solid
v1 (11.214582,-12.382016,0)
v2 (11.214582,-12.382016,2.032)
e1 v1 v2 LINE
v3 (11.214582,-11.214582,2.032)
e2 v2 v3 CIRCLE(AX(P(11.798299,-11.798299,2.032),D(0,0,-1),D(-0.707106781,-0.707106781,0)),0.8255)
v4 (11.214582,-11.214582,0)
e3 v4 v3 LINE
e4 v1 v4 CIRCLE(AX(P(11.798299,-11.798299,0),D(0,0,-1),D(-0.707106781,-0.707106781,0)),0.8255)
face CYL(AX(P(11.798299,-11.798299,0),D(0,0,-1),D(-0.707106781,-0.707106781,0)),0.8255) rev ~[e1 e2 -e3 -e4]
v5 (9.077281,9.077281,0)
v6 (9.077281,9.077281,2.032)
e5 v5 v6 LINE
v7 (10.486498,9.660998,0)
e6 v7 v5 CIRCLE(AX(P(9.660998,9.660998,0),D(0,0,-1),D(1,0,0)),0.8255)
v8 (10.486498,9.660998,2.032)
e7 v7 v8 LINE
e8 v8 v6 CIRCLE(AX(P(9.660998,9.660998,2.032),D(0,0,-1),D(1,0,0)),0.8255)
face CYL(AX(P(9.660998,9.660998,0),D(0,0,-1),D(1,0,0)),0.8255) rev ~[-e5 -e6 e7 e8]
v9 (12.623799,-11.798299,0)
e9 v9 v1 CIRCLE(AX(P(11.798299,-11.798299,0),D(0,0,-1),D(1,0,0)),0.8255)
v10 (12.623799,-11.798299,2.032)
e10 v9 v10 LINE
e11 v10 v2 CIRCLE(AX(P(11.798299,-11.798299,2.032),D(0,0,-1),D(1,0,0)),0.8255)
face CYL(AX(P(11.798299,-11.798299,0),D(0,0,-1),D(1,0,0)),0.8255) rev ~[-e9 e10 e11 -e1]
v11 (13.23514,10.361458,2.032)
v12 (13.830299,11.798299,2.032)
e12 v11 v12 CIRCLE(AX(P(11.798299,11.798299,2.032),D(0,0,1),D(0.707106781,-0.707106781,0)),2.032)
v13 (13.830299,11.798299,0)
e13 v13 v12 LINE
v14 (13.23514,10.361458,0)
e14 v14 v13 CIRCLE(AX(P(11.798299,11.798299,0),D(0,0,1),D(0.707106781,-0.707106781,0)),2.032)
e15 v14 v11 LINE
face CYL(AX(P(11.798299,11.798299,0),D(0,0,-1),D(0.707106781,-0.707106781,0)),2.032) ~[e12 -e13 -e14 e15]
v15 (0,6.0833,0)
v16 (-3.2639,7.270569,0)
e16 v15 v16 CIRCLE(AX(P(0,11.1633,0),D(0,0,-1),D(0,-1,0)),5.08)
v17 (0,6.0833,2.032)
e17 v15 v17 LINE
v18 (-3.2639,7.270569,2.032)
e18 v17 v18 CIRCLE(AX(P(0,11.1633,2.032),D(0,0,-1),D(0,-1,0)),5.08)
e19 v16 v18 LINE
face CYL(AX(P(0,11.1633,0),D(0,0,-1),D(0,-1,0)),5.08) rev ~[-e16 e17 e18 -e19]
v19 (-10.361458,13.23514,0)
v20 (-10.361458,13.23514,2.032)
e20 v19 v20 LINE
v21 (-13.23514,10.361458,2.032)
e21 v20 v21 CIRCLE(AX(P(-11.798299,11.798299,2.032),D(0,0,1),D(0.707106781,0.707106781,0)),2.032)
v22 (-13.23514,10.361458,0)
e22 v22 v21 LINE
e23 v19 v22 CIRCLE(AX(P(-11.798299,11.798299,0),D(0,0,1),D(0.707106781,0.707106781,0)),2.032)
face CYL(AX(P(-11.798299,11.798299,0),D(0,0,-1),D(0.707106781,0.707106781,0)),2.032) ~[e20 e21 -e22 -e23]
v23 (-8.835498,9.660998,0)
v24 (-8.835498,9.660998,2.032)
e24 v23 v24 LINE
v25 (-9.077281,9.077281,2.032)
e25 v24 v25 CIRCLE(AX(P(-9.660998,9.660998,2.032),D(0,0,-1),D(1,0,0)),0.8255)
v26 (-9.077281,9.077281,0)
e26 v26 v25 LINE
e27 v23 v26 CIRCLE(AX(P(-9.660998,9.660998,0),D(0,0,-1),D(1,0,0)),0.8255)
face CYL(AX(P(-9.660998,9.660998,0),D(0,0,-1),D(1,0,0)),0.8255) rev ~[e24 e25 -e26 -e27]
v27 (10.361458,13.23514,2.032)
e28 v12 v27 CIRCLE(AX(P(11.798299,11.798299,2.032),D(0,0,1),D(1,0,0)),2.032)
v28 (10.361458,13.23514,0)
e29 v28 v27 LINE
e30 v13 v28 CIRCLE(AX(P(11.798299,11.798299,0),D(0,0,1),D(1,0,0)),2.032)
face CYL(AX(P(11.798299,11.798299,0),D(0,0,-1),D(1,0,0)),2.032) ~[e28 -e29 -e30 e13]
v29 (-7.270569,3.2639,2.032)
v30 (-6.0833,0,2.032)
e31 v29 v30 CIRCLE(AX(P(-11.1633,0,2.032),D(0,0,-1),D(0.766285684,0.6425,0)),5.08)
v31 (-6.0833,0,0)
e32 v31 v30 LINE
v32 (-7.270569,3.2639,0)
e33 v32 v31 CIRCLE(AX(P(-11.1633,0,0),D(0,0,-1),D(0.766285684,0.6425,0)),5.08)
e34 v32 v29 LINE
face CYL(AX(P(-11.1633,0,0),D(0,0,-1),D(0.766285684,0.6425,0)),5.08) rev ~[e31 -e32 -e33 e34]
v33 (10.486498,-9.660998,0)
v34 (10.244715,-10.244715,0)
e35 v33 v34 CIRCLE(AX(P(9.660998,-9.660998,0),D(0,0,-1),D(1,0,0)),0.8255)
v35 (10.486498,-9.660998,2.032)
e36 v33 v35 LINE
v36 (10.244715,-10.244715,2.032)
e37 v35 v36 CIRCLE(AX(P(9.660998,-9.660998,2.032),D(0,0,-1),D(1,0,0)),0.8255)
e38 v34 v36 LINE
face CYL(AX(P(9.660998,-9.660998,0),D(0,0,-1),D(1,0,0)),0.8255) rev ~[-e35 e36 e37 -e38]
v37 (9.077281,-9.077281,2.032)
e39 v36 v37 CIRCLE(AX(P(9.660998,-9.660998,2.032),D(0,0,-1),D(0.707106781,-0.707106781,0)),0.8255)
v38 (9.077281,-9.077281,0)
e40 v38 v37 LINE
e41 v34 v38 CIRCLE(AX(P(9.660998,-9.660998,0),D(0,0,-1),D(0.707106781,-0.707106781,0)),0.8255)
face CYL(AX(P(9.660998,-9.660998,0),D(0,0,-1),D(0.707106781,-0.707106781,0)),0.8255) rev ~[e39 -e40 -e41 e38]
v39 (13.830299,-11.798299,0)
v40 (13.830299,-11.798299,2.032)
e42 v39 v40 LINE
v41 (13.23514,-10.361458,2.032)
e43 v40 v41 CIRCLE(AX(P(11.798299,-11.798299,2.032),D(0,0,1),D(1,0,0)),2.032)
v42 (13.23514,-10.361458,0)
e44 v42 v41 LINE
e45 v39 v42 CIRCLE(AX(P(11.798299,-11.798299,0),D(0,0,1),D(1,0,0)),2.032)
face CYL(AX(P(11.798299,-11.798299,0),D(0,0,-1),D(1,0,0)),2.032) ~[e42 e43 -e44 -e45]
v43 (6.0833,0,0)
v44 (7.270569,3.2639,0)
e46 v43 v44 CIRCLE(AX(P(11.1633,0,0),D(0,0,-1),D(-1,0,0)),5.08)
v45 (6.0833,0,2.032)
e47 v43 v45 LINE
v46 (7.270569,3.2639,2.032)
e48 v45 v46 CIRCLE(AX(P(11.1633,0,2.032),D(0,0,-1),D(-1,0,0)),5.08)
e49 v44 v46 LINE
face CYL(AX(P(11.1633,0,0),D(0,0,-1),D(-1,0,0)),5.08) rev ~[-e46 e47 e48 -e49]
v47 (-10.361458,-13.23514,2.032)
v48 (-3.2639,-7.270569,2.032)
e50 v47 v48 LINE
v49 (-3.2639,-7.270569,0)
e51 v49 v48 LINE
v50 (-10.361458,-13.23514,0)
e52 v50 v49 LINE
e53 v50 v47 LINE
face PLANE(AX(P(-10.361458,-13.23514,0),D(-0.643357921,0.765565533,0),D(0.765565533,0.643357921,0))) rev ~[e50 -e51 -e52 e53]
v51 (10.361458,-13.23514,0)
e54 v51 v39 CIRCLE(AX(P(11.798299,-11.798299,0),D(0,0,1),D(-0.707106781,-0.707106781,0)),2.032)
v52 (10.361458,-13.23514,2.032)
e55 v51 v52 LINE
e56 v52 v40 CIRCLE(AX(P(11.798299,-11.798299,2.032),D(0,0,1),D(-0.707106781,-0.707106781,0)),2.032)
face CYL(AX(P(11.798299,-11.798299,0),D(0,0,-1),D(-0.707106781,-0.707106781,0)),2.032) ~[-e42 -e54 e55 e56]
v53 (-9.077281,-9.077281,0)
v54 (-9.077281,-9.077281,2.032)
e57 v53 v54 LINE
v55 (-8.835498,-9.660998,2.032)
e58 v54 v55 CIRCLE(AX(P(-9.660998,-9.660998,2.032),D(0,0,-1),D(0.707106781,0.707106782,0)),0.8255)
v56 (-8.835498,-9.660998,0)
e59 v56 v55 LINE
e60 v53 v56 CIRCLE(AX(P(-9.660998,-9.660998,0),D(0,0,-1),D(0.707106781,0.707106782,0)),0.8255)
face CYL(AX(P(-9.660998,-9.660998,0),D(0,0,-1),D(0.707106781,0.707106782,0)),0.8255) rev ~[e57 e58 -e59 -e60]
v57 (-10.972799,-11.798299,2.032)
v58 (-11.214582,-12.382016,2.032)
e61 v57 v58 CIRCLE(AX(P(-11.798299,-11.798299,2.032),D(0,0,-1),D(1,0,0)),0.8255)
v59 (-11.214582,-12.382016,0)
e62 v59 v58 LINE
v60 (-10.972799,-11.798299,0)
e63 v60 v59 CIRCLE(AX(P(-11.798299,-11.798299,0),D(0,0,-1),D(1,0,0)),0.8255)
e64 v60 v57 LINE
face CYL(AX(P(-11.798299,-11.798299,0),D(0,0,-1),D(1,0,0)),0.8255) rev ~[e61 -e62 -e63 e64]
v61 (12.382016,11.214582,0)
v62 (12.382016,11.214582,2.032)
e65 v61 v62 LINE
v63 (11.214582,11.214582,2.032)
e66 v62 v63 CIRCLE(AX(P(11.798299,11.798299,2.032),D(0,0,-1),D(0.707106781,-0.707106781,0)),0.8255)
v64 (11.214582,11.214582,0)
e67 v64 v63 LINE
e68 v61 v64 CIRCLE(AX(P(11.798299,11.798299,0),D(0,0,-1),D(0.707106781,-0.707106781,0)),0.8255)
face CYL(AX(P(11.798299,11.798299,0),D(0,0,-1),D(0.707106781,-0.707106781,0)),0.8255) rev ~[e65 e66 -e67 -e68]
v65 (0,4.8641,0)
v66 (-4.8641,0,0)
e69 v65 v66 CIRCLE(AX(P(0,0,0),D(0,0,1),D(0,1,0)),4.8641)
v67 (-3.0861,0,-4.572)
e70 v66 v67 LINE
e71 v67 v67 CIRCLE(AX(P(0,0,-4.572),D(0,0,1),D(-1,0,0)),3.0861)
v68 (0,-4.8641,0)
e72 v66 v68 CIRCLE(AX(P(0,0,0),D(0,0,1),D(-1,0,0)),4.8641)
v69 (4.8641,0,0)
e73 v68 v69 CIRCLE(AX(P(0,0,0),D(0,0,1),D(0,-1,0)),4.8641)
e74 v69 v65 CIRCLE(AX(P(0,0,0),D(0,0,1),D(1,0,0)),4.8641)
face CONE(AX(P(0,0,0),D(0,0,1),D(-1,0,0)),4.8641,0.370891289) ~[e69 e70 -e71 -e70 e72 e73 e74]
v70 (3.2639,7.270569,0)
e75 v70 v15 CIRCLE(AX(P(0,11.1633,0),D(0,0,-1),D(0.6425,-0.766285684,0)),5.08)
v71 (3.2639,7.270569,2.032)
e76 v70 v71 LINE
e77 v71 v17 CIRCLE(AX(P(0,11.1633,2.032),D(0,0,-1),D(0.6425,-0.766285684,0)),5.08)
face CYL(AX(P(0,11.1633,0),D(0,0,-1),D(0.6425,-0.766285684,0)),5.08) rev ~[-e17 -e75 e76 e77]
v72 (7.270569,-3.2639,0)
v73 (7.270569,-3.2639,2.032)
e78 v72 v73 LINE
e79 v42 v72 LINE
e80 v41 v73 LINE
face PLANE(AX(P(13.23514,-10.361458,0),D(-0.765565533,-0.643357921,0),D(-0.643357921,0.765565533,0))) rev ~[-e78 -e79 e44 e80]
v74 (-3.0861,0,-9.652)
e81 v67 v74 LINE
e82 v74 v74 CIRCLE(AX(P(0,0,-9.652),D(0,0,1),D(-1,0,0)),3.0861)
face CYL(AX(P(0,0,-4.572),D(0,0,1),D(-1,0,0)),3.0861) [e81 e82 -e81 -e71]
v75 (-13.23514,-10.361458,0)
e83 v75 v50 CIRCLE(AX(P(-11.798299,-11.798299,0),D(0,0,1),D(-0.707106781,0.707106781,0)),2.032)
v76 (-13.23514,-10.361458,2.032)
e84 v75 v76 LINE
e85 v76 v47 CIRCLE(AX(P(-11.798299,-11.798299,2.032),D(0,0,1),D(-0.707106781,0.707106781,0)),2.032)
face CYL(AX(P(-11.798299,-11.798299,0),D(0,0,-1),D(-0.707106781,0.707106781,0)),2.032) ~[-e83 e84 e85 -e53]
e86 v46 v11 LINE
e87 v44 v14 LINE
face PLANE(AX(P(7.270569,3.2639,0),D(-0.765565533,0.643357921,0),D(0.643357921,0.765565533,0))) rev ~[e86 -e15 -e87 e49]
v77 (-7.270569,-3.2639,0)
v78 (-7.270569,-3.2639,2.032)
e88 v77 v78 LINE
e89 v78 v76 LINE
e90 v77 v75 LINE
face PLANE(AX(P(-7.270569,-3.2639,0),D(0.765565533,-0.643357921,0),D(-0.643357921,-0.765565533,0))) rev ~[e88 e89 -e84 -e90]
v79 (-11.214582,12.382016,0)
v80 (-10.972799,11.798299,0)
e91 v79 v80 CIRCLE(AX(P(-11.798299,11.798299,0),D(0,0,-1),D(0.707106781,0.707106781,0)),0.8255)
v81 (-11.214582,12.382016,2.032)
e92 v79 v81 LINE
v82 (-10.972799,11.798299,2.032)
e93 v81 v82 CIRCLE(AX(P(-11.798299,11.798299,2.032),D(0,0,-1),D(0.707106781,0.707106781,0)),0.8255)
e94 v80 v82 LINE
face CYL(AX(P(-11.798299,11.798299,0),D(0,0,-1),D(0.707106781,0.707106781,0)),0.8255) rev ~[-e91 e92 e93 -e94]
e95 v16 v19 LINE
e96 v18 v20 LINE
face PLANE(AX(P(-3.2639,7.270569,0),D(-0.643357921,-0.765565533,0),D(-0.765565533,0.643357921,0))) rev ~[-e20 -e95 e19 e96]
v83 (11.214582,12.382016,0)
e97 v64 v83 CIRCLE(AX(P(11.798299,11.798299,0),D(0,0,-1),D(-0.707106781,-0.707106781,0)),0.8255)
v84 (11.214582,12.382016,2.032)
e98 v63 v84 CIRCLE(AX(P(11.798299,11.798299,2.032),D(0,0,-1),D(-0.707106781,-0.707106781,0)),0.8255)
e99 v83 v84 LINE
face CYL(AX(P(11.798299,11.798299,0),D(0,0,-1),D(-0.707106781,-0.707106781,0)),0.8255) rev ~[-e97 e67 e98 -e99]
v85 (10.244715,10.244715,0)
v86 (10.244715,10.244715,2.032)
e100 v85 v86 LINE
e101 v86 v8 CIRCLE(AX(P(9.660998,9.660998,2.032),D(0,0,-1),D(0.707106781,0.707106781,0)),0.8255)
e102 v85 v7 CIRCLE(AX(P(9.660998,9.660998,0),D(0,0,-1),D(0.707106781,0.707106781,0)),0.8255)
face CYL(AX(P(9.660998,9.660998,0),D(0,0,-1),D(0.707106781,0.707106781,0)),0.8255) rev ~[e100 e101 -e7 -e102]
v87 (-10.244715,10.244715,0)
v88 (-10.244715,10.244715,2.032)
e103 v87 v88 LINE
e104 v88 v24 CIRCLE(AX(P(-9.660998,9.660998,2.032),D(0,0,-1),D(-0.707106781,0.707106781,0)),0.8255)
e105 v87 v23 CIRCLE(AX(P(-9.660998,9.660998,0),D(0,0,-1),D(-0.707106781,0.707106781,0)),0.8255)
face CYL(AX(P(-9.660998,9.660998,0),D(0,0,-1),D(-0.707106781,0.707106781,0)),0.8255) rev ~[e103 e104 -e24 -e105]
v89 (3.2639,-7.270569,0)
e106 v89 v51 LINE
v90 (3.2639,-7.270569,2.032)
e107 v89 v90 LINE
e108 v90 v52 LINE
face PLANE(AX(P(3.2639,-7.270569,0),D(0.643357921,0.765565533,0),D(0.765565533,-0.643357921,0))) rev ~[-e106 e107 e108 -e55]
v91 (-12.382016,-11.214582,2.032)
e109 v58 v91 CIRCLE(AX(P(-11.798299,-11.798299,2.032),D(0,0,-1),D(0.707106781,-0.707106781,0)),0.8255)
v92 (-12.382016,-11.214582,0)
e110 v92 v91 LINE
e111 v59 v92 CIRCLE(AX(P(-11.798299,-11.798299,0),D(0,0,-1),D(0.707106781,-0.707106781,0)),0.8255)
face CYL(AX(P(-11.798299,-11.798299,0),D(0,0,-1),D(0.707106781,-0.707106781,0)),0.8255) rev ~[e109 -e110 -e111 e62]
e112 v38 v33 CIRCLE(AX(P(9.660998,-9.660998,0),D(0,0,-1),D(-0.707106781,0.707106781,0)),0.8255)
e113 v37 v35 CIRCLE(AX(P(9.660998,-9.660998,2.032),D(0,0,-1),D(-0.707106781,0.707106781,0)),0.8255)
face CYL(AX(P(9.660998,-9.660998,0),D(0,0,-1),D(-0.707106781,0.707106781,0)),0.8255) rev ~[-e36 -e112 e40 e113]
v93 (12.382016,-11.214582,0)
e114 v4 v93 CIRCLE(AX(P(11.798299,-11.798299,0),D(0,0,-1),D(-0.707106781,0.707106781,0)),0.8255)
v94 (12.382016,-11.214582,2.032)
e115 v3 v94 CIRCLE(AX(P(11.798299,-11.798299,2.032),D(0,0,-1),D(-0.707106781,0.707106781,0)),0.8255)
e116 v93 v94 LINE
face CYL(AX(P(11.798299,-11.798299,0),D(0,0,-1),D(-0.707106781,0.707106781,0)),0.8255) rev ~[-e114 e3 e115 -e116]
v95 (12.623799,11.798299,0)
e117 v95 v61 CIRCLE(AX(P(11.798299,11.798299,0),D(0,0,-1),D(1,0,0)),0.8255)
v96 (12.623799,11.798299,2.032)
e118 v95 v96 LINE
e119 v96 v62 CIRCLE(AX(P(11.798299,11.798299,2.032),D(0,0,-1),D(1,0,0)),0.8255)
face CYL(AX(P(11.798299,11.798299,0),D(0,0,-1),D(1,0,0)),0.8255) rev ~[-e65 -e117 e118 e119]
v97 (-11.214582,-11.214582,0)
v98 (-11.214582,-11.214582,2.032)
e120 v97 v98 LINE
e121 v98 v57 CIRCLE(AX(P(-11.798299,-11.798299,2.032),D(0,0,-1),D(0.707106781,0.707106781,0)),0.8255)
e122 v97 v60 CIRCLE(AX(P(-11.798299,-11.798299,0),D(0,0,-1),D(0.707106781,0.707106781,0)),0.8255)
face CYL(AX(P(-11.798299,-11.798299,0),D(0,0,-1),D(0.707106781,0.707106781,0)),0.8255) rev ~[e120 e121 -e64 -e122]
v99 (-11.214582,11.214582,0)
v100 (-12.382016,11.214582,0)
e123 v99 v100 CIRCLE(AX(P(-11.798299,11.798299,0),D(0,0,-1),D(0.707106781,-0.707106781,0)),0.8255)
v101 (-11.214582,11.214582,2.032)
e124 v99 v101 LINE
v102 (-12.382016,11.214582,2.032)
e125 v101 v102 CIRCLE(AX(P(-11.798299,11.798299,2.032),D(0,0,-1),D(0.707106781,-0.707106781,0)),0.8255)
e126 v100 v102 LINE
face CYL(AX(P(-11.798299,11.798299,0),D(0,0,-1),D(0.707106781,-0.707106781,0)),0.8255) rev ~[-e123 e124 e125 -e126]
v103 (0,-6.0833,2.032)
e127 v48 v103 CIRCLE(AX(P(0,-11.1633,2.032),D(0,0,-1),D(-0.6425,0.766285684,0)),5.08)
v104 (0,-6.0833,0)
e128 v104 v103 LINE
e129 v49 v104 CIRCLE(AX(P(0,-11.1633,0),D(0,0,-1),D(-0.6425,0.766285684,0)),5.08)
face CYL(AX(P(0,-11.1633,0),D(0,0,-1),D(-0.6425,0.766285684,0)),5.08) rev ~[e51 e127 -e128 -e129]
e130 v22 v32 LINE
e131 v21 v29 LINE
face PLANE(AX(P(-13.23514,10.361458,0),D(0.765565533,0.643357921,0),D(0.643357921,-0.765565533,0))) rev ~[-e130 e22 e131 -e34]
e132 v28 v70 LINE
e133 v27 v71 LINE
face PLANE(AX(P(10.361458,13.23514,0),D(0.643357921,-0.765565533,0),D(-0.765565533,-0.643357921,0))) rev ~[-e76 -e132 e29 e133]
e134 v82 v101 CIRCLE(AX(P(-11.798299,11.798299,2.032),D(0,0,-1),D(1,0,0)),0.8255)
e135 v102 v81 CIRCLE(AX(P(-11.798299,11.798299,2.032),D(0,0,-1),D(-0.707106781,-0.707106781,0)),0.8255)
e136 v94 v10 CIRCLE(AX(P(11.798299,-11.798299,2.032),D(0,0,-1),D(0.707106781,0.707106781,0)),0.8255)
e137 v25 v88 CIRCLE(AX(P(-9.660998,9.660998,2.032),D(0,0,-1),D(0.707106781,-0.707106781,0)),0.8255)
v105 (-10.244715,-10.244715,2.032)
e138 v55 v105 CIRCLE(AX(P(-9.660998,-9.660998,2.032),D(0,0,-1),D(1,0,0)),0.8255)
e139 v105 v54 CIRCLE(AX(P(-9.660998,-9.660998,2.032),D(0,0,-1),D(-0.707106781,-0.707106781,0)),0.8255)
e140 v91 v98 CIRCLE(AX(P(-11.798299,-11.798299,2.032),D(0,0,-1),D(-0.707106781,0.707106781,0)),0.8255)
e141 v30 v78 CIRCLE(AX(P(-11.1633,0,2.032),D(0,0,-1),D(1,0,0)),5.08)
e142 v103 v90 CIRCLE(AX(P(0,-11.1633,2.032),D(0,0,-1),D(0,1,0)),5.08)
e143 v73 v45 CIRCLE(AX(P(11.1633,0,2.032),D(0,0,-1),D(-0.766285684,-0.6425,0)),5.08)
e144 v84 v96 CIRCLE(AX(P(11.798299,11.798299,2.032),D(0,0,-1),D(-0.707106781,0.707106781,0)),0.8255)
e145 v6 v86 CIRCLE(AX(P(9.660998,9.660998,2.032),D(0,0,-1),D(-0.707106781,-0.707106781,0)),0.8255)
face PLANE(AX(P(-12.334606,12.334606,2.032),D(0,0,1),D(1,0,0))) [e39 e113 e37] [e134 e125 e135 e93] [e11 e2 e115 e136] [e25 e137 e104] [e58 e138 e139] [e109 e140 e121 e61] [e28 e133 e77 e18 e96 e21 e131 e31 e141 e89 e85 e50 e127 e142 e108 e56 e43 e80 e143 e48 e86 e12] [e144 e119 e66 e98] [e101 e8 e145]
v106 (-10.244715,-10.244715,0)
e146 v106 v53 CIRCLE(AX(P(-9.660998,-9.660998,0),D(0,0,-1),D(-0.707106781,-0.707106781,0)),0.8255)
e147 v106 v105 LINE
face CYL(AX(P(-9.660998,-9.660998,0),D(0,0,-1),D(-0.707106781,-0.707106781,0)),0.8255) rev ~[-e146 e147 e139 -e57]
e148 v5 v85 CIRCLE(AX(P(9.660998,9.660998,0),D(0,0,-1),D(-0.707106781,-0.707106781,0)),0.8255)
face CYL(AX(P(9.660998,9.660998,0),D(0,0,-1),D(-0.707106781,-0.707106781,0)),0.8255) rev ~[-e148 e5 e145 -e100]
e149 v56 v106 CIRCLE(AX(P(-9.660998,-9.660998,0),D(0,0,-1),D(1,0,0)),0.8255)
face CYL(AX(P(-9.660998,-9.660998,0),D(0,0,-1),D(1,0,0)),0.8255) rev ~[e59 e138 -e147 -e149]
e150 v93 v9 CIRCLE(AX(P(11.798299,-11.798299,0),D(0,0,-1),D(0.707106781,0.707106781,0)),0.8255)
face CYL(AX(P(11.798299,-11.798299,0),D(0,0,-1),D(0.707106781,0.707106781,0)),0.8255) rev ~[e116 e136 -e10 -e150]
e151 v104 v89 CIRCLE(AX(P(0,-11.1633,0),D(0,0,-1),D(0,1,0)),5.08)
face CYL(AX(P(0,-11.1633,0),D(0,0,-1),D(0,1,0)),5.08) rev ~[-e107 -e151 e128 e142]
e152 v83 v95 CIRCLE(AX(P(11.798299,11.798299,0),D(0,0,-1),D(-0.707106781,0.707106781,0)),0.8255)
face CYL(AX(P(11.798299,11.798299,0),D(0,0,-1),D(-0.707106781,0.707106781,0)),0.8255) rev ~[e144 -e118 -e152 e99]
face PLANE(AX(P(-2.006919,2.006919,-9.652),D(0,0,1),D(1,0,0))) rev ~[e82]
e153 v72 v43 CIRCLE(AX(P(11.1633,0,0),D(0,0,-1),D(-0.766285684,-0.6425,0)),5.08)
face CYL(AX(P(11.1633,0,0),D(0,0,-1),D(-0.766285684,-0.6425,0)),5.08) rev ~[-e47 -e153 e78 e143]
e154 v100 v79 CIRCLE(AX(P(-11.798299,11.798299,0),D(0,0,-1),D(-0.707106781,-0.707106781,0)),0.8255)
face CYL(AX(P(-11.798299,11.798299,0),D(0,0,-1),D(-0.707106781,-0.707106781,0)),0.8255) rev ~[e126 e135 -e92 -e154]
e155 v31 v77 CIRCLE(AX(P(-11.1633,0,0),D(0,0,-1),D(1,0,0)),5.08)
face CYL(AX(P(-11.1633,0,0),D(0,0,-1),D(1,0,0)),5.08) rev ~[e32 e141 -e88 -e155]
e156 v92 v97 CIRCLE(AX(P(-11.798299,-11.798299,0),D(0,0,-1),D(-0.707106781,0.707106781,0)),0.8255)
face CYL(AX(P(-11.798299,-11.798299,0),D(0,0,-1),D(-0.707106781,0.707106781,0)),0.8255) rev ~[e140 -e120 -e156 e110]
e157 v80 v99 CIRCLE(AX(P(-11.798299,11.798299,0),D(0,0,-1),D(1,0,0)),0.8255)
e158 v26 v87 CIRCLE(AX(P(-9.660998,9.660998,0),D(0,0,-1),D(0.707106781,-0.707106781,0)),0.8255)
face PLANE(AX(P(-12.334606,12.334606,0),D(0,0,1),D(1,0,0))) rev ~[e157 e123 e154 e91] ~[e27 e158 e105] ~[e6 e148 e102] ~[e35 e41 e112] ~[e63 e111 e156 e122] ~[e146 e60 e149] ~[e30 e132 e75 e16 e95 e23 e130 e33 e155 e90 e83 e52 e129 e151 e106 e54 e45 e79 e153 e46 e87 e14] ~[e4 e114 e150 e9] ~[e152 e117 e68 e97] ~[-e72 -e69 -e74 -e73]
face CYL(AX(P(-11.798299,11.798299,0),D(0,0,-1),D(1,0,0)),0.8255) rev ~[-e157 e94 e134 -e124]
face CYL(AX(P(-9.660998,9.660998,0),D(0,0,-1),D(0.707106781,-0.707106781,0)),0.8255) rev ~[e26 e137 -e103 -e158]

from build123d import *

# Parameters (mm, degrees)
F1_DEPTH = 2.032
F2_DEPTH = 4.572
F4_DEPTH = 5.08


# Not quite as in the source:
# - a fillet or chamfer that OpenCascade refuses, or shapes differently, is made with other operations: its cross-section is extruded or revolved along the edge and cut away or added


with BuildPart() as f1:
    # F0 (on Top) → F1 (new body)
    with BuildSketch(Plane.XY):
        with BuildLine():
            Line((-11.2145823858, 12.3820156815), (-10.3614580543, 13.235140013))
            ThreePointArc((-10.3614580543, 13.235140013), (-13.235140013, 13.235140013), (-13.235140013, 10.3614580543))
            Line((-13.235140013, 10.3614580543), (-12.3820156815, 11.2145823858))
            ThreePointArc((-12.3820156815, 11.2145823858), (-12.3820156815, 12.3820156815), (-11.2145823858, 12.3820156815))
        make_face()
        with BuildLine():
            ThreePointArc((13.8302990336, 11.7982990336), (12.5759117682, 13.6756222437), (10.3614580543, 13.235140013))
            Line((10.3614580543, 13.235140013), (11.2145823858, 12.3820156815))
            ThreePointArc((11.2145823858, 12.3820156815), (12.1142042071, 12.5609615877), (12.6237990336, 11.7982990336))
            ThreePointArc((12.6237990336, 11.7982990336), (12.5609615877, 11.4823938602), (12.3820156815, 11.2145823858))
            Line((12.3820156815, 11.2145823858), (13.235140013, 10.3614580543))
            ThreePointArc((13.235140013, 10.3614580543), (13.6756222437, 11.0206862991), (13.8302990336, 11.7982990336))
        make_face()
        with BuildLine():
            ThreePointArc((13.8302990336, -11.7982990336), (13.6756222437, -11.0206862991), (13.235140013, -10.3614580543))
            Line((13.235140013, -10.3614580543), (12.3820156815, -11.2145823858))
            ThreePointArc((12.3820156815, -11.2145823858), (12.5609615877, -11.4823938602), (12.6237990336, -11.7982990336))
            ThreePointArc((12.6237990336, -11.7982990336), (12.1142042071, -12.5609615877), (11.2145823858, -12.3820156815))
            Line((11.2145823858, -12.3820156815), (10.3614580543, -13.235140013))
            ThreePointArc((10.3614580543, -13.235140013), (12.5759117682, -13.6756222437), (13.8302990336, -11.7982990336))
        make_face()
        with BuildLine():
            Line((-12.3820156815, -11.2145823858), (-13.235140013, -10.3614580543))
            ThreePointArc((-13.235140013, -10.3614580543), (-13.235140013, -13.235140013), (-10.3614580543, -13.235140013))
            Line((-10.3614580543, -13.235140013), (-11.2145823858, -12.3820156815))
            ThreePointArc((-11.2145823858, -12.3820156815), (-12.3820156815, -12.3820156815), (-12.3820156815, -11.2145823858))
        make_face()
        with BuildLine():
            Line((-12.3820156815, 11.2145823858), (-13.235140013, 10.3614580543))
            ThreePointArc((-13.235140013, 10.3614580543), (-11.7982990336, 9.7662990336), (-10.3614580543, 10.3614580543))
            Line((-10.3614580543, 10.3614580543), (-11.2145823858, 11.2145823858))
            ThreePointArc((-11.2145823858, 11.2145823858), (-11.7982990336, 10.9727990336), (-12.3820156815, 11.2145823858))
        make_face()
        with BuildLine():
            ThreePointArc((-9.7662990336, 11.7982990336), (-9.9209758236, 12.5759117682), (-10.3614580543, 13.235140013))
            Line((-10.3614580543, 13.235140013), (-11.2145823858, 12.3820156815))
            ThreePointArc((-11.2145823858, 12.3820156815), (-11.0356364796, 12.1142042071), (-10.9727990336, 11.7982990336))
            ThreePointArc((-10.9727990336, 11.7982990336), (-11.0356364796, 11.4823938602), (-11.2145823858, 11.2145823858))
            Line((-11.2145823858, 11.2145823858), (-10.3614580543, 10.3614580543))
            ThreePointArc((-10.3614580543, 10.3614580543), (-9.9209758236, 11.0206862991), (-9.7662990336, 11.7982990336))
        make_face()
        with BuildLine():
            Line((11.2145823858, 12.3820156815), (10.3614580543, 13.235140013))
            ThreePointArc((10.3614580543, 13.235140013), (9.7662990336, 11.7982990336), (10.3614580543, 10.3614580543))
            Line((10.3614580543, 10.3614580543), (11.2145823858, 11.2145823858))
            ThreePointArc((11.2145823858, 11.2145823858), (10.9727990336, 11.7982990336), (11.2145823858, 12.3820156815))
        make_face()
        with BuildLine():
            Line((11.2145823858, 11.2145823858), (10.3614580543, 10.3614580543))
            ThreePointArc((10.3614580543, 10.3614580543), (11.7982990336, 9.7662990336), (13.235140013, 10.3614580543))
            Line((13.235140013, 10.3614580543), (12.3820156815, 11.2145823858))
            ThreePointArc((12.3820156815, 11.2145823858), (11.7982990336, 10.9727990336), (11.2145823858, 11.2145823858))
        make_face()
        with BuildLine():
            Line((12.3820156815, -11.2145823858), (13.235140013, -10.3614580543))
            ThreePointArc((13.235140013, -10.3614580543), (11.7982990336, -9.7662990336), (10.3614580543, -10.3614580543))
            Line((10.3614580543, -10.3614580543), (11.2145823858, -11.2145823858))
            ThreePointArc((11.2145823858, -11.2145823858), (11.7982990336, -10.9727990336), (12.3820156815, -11.2145823858))
        make_face()
        with BuildLine():
            ThreePointArc((10.3614580543, -10.3614580543), (9.7662990336, -11.7982990336), (10.3614580543, -13.235140013))
            Line((10.3614580543, -13.235140013), (11.2145823858, -12.3820156815))
            ThreePointArc((11.2145823858, -12.3820156815), (10.9727990336, -11.7982990336), (11.2145823858, -11.2145823858))
            Line((11.2145823858, -11.2145823858), (10.3614580543, -10.3614580543))
        make_face()
        with BuildLine():
            Line((-11.2145823858, -12.3820156815), (-10.3614580543, -13.235140013))
            ThreePointArc((-10.3614580543, -13.235140013), (-9.9209758236, -12.5759117682), (-9.7662990336, -11.7982990336))
            ThreePointArc((-9.7662990336, -11.7982990336), (-9.9209758236, -11.0206862991), (-10.3614580543, -10.3614580543))
            Line((-10.3614580543, -10.3614580543), (-11.2145823858, -11.2145823858))
            ThreePointArc((-11.2145823858, -11.2145823858), (-11.0356364796, -11.4823938602), (-10.9727990336, -11.7982990336))
            ThreePointArc((-10.9727990336, -11.7982990336), (-11.0356364796, -12.1142042071), (-11.2145823858, -12.3820156815))
        make_face()
        with BuildLine():
            ThreePointArc((-10.3614580543, -10.3614580543), (-11.7982990336, -9.7662990336), (-13.235140013, -10.3614580543))
            Line((-13.235140013, -10.3614580543), (-12.3820156815, -11.2145823858))
            ThreePointArc((-12.3820156815, -11.2145823858), (-11.7982990336, -10.9727990336), (-11.2145823858, -11.2145823858))
            Line((-11.2145823858, -11.2145823858), (-10.3614580543, -10.3614580543))
        make_face()
        with BuildLine():
            Line((-5.2672343618, 5.2672343618), (-3.2639, 7.2705687236))
            Line((-3.2639, 7.2705687236), (-10.3614580543, 13.235140013))
            ThreePointArc((-10.3614580543, 13.235140013), (-9.9209758236, 12.5759117682), (-9.7662990336, 11.7982990336))
            ThreePointArc((-9.7662990336, 11.7982990336), (-9.9209758236, 11.0206862991), (-10.3614580543, 10.3614580543))
            Line((-10.3614580543, 10.3614580543), (-10.2447147247, 10.2447147247))
            ThreePointArc((-10.2447147247, 10.2447147247), (-9.3450929034, 10.4236606309), (-8.8354980768, 9.6609980768))
            ThreePointArc((-8.8354980768, 9.6609980768), (-8.8983355227, 9.3450929034), (-9.077281429, 9.077281429))
            Line((-9.077281429, 9.077281429), (-5.2672343618, 5.2672343618))
        make_face()
        with BuildLine():
            Line((10.3614580543, 13.235140013), (3.2639, 7.2705687236))
            Line((3.2639, 7.2705687236), (5.2672343618, 5.2672343618))
            Line((5.2672343618, 5.2672343618), (9.077281429, 9.077281429))
            ThreePointArc((9.077281429, 9.077281429), (9.077281429, 10.2447147247), (10.2447147247, 10.2447147247))
            Line((10.2447147247, 10.2447147247), (10.3614580543, 10.3614580543))
            ThreePointArc((10.3614580543, 10.3614580543), (9.7662990336, 11.7982990336), (10.3614580543, 13.235140013))
        make_face()
        with BuildLine():
            Line((9.077281429, 9.077281429), (5.2672343618, 5.2672343618))
            Line((5.2672343618, 5.2672343618), (7.2705687236, 3.2639))
            Line((7.2705687236, 3.2639), (13.235140013, 10.3614580543))
            ThreePointArc((13.235140013, 10.3614580543), (11.7982990336, 9.7662990336), (10.3614580543, 10.3614580543))
            Line((10.3614580543, 10.3614580543), (10.2447147247, 10.2447147247))
            ThreePointArc((10.2447147247, 10.2447147247), (10.4236606309, 9.9769032503), (10.4864980768, 9.6609980768))
            ThreePointArc((10.4864980768, 9.6609980768), (9.9769032503, 8.8983355227), (9.077281429, 9.077281429))
        make_face()
        with BuildLine():
            Line((13.235140013, -10.3614580543), (7.2705687236, -3.2639))
            Line((7.2705687236, -3.2639), (5.2672343618, -5.2672343618))
            Line((5.2672343618, -5.2672343618), (9.077281429, -9.077281429))
            ThreePointArc((9.077281429, -9.077281429), (9.9769032503, -8.8983355227), (10.4864980768, -9.6609980768))
            ThreePointArc((10.4864980768, -9.6609980768), (10.4236606309, -9.9769032503), (10.2447147247, -10.2447147247))
            Line((10.2447147247, -10.2447147247), (10.3614580543, -10.3614580543))
            ThreePointArc((10.3614580543, -10.3614580543), (11.7982990336, -9.7662990336), (13.235140013, -10.3614580543))
        make_face()
        with BuildLine():
            Line((5.2672343618, -5.2672343618), (3.2639, -7.2705687236))
            Line((3.2639, -7.2705687236), (10.3614580543, -13.235140013))
            ThreePointArc((10.3614580543, -13.235140013), (9.7662990336, -11.7982990336), (10.3614580543, -10.3614580543))
            Line((10.3614580543, -10.3614580543), (10.2447147247, -10.2447147247))
            ThreePointArc((10.2447147247, -10.2447147247), (9.077281429, -10.2447147247), (9.077281429, -9.077281429))
            Line((9.077281429, -9.077281429), (5.2672343618, -5.2672343618))
        make_face()
        with BuildLine():
            Line((-3.2639, -7.2705687236), (-5.2672343618, -5.2672343618))
            Line((-5.2672343618, -5.2672343618), (-9.077281429, -9.077281429))
            ThreePointArc((-9.077281429, -9.077281429), (-8.8983355227, -9.3450929034), (-8.8354980768, -9.6609980768))
            ThreePointArc((-8.8354980768, -9.6609980768), (-9.3450929034, -10.4236606309), (-10.2447147247, -10.2447147247))
            Line((-10.2447147247, -10.2447147247), (-10.3614580543, -10.3614580543))
            ThreePointArc((-10.3614580543, -10.3614580543), (-9.9209758236, -11.0206862991), (-9.7662990336, -11.7982990336))
            ThreePointArc((-9.7662990336, -11.7982990336), (-9.9209758236, -12.5759117682), (-10.3614580543, -13.235140013))
            Line((-10.3614580543, -13.235140013), (-3.2639, -7.2705687236))
        make_face()
        with BuildLine():
            Line((-7.2705687236, 3.2639), (-5.2672343618, 5.2672343618))
            Line((-5.2672343618, 5.2672343618), (-9.077281429, 9.077281429))
            ThreePointArc((-9.077281429, 9.077281429), (-10.2447147247, 9.077281429), (-10.2447147247, 10.2447147247))
            Line((-10.2447147247, 10.2447147247), (-10.3614580543, 10.3614580543))
            ThreePointArc((-10.3614580543, 10.3614580543), (-11.7982990336, 9.7662990336), (-13.235140013, 10.3614580543))
            Line((-13.235140013, 10.3614580543), (-7.2705687236, 3.2639))
        make_face()
        with BuildLine():
            Line((-5.2672343618, -5.2672343618), (-7.2705687236, -3.2639))
            Line((-7.2705687236, -3.2639), (-13.235140013, -10.3614580543))
            ThreePointArc((-13.235140013, -10.3614580543), (-11.7982990336, -9.7662990336), (-10.3614580543, -10.3614580543))
            Line((-10.3614580543, -10.3614580543), (-10.2447147247, -10.2447147247))
            ThreePointArc((-10.2447147247, -10.2447147247), (-10.2447147247, -9.077281429), (-9.077281429, -9.077281429))
            Line((-9.077281429, -9.077281429), (-5.2672343618, -5.2672343618))
        make_face()
        with BuildLine():
            ThreePointArc((3.2639, 7.2705687236), (1.7365663126, 6.3893354587), (0, 6.0833))
            Line((0, 6.0833), (0, 4.8641))
            ThreePointArc((0, 4.8641), (3.4394380944, 3.4394380944), (4.8641, 0))
            Line((4.8641, 0), (6.0833, 0))
            ThreePointArc((6.0833, 0), (6.3893354587, 1.7365663126), (7.2705687236, 3.2639))
            Line((7.2705687236, 3.2639), (5.2672343618, 5.2672343618))
            Line((5.2672343618, 5.2672343618), (3.2639, 7.2705687236))
        make_face()
        with BuildLine():
            Line((0, 4.8641), (0, 6.0833))
            ThreePointArc((0, 6.0833), (-1.7365663126, 6.3893354587), (-3.2639, 7.2705687236))
            Line((-3.2639, 7.2705687236), (-5.2672343618, 5.2672343618))
            Line((-5.2672343618, 5.2672343618), (-7.2705687236, 3.2639))
            ThreePointArc((-7.2705687236, 3.2639), (-6.3893354587, 1.7365663126), (-6.0833, 0))
            Line((-6.0833, 0), (-4.8641, 0))
            ThreePointArc((-4.8641, 0), (-3.4394380944, 3.4394380944), (0, 4.8641))
        make_face()
        with BuildLine():
            Line((0, -4.8641), (0, 0))
            Line((0, 0), (-4.8641, 0))
            ThreePointArc((-4.8641, 0), (-3.4394380944, -3.4394380944), (0, -4.8641))
        make_face()
        with BuildLine():
            Line((4.8641, 0), (0, 0))
            Line((0, 0), (0, -4.8641))
            ThreePointArc((0, -4.8641), (3.4394380944, -3.4394380944), (4.8641, 0))
        make_face()
        with BuildLine():
            Line((5.2672343618, -5.2672343618), (7.2705687236, -3.2639))
            ThreePointArc((7.2705687236, -3.2639), (6.3893354587, -1.7365663126), (6.0833, 0))
            Line((6.0833, 0), (4.8641, 0))
            ThreePointArc((4.8641, 0), (3.4394380944, -3.4394380944), (0, -4.8641))
            Line((0, -4.8641), (0, -6.0833))
            ThreePointArc((0, -6.0833), (1.7365663126, -6.3893354587), (3.2639, -7.2705687236))
            Line((3.2639, -7.2705687236), (5.2672343618, -5.2672343618))
        make_face()
        with BuildLine():
            ThreePointArc((-6.0833, 0), (-6.3893354587, -1.7365663126), (-7.2705687236, -3.2639))
            Line((-7.2705687236, -3.2639), (-5.2672343618, -5.2672343618))
            Line((-5.2672343618, -5.2672343618), (-3.2639, -7.2705687236))
            ThreePointArc((-3.2639, -7.2705687236), (-1.7365663126, -6.3893354587), (0, -6.0833))
            Line((0, -6.0833), (0, -4.8641))
            ThreePointArc((0, -4.8641), (-3.4394380944, -3.4394380944), (-4.8641, 0))
            Line((-4.8641, 0), (-6.0833, 0))
        make_face()
        with BuildLine():
            Line((0, 0), (0, 4.8641))
            ThreePointArc((0, 4.8641), (-3.4394380944, 3.4394380944), (-4.8641, 0))
            Line((-4.8641, 0), (0, 0))
        make_face()
        with BuildLine():
            ThreePointArc((4.8641, 0), (3.4394380944, 3.4394380944), (0, 4.8641))
            Line((0, 4.8641), (0, 0))
            Line((0, 0), (4.8641, 0))
        make_face()
    extrude(amount=F1_DEPTH)

    # F0 (on Top) → F2 (join)
    with BuildSketch(Plane.XY):
        with BuildLine():
            Line((0, 0), (0, 4.8641))
            ThreePointArc((0, 4.8641), (-3.4394380944, 3.4394380944), (-4.8641, 0))
            Line((-4.8641, 0), (0, 0))
        make_face()
        with BuildLine():
            Line((4.8641, 0), (0, 0))
            Line((0, 0), (0, -4.8641))
            ThreePointArc((0, -4.8641), (3.4394380944, -3.4394380944), (4.8641, 0))
        make_face()
        with BuildLine():
            ThreePointArc((4.8641, 0), (3.4394380944, 3.4394380944), (0, 4.8641))
            Line((0, 4.8641), (0, 0))
            Line((0, 0), (4.8641, 0))
        make_face()
        with BuildLine():
            Line((0, -4.8641), (0, 0))
            Line((0, 0), (-4.8641, 0))
            ThreePointArc((-4.8641, 0), (-3.4394380944, -3.4394380944), (0, -4.8641))
        make_face()
    extrude(amount=-F2_DEPTH)

    # F3: chamfer of 4.572 x 1.778 on 1 edges, made by hand


with BuildPart() as f3_tool2:
    # F3_s3 → F3_t4 (revolve)
    with BuildSketch(Plane.XZ):
        Polygon((-4.8641, 0), (-3.0861, -4.572), (-4.8641, -4.572), align=None)
    revolve(axis=Axis((0, 0, -4.572), (0, 0, 1)))

    split(bisect_by=Plane.XY, keep=Keep.BOTTOM)


with BuildPart() as f1_1:
    add(f1.part)

    # F3_t1: cut F3_tool2
    add(f3_tool2.part, mode=Mode.SUBTRACT)

    # F4 (add): a face of the model
    f4_faces = [f1_1.faces().sort_by_distance(p)[0] for p in [
        (0, 0, -4.572),
    ]]
    extrude(f4_faces, amount=F4_DEPTH)


solid = f1_1.part
